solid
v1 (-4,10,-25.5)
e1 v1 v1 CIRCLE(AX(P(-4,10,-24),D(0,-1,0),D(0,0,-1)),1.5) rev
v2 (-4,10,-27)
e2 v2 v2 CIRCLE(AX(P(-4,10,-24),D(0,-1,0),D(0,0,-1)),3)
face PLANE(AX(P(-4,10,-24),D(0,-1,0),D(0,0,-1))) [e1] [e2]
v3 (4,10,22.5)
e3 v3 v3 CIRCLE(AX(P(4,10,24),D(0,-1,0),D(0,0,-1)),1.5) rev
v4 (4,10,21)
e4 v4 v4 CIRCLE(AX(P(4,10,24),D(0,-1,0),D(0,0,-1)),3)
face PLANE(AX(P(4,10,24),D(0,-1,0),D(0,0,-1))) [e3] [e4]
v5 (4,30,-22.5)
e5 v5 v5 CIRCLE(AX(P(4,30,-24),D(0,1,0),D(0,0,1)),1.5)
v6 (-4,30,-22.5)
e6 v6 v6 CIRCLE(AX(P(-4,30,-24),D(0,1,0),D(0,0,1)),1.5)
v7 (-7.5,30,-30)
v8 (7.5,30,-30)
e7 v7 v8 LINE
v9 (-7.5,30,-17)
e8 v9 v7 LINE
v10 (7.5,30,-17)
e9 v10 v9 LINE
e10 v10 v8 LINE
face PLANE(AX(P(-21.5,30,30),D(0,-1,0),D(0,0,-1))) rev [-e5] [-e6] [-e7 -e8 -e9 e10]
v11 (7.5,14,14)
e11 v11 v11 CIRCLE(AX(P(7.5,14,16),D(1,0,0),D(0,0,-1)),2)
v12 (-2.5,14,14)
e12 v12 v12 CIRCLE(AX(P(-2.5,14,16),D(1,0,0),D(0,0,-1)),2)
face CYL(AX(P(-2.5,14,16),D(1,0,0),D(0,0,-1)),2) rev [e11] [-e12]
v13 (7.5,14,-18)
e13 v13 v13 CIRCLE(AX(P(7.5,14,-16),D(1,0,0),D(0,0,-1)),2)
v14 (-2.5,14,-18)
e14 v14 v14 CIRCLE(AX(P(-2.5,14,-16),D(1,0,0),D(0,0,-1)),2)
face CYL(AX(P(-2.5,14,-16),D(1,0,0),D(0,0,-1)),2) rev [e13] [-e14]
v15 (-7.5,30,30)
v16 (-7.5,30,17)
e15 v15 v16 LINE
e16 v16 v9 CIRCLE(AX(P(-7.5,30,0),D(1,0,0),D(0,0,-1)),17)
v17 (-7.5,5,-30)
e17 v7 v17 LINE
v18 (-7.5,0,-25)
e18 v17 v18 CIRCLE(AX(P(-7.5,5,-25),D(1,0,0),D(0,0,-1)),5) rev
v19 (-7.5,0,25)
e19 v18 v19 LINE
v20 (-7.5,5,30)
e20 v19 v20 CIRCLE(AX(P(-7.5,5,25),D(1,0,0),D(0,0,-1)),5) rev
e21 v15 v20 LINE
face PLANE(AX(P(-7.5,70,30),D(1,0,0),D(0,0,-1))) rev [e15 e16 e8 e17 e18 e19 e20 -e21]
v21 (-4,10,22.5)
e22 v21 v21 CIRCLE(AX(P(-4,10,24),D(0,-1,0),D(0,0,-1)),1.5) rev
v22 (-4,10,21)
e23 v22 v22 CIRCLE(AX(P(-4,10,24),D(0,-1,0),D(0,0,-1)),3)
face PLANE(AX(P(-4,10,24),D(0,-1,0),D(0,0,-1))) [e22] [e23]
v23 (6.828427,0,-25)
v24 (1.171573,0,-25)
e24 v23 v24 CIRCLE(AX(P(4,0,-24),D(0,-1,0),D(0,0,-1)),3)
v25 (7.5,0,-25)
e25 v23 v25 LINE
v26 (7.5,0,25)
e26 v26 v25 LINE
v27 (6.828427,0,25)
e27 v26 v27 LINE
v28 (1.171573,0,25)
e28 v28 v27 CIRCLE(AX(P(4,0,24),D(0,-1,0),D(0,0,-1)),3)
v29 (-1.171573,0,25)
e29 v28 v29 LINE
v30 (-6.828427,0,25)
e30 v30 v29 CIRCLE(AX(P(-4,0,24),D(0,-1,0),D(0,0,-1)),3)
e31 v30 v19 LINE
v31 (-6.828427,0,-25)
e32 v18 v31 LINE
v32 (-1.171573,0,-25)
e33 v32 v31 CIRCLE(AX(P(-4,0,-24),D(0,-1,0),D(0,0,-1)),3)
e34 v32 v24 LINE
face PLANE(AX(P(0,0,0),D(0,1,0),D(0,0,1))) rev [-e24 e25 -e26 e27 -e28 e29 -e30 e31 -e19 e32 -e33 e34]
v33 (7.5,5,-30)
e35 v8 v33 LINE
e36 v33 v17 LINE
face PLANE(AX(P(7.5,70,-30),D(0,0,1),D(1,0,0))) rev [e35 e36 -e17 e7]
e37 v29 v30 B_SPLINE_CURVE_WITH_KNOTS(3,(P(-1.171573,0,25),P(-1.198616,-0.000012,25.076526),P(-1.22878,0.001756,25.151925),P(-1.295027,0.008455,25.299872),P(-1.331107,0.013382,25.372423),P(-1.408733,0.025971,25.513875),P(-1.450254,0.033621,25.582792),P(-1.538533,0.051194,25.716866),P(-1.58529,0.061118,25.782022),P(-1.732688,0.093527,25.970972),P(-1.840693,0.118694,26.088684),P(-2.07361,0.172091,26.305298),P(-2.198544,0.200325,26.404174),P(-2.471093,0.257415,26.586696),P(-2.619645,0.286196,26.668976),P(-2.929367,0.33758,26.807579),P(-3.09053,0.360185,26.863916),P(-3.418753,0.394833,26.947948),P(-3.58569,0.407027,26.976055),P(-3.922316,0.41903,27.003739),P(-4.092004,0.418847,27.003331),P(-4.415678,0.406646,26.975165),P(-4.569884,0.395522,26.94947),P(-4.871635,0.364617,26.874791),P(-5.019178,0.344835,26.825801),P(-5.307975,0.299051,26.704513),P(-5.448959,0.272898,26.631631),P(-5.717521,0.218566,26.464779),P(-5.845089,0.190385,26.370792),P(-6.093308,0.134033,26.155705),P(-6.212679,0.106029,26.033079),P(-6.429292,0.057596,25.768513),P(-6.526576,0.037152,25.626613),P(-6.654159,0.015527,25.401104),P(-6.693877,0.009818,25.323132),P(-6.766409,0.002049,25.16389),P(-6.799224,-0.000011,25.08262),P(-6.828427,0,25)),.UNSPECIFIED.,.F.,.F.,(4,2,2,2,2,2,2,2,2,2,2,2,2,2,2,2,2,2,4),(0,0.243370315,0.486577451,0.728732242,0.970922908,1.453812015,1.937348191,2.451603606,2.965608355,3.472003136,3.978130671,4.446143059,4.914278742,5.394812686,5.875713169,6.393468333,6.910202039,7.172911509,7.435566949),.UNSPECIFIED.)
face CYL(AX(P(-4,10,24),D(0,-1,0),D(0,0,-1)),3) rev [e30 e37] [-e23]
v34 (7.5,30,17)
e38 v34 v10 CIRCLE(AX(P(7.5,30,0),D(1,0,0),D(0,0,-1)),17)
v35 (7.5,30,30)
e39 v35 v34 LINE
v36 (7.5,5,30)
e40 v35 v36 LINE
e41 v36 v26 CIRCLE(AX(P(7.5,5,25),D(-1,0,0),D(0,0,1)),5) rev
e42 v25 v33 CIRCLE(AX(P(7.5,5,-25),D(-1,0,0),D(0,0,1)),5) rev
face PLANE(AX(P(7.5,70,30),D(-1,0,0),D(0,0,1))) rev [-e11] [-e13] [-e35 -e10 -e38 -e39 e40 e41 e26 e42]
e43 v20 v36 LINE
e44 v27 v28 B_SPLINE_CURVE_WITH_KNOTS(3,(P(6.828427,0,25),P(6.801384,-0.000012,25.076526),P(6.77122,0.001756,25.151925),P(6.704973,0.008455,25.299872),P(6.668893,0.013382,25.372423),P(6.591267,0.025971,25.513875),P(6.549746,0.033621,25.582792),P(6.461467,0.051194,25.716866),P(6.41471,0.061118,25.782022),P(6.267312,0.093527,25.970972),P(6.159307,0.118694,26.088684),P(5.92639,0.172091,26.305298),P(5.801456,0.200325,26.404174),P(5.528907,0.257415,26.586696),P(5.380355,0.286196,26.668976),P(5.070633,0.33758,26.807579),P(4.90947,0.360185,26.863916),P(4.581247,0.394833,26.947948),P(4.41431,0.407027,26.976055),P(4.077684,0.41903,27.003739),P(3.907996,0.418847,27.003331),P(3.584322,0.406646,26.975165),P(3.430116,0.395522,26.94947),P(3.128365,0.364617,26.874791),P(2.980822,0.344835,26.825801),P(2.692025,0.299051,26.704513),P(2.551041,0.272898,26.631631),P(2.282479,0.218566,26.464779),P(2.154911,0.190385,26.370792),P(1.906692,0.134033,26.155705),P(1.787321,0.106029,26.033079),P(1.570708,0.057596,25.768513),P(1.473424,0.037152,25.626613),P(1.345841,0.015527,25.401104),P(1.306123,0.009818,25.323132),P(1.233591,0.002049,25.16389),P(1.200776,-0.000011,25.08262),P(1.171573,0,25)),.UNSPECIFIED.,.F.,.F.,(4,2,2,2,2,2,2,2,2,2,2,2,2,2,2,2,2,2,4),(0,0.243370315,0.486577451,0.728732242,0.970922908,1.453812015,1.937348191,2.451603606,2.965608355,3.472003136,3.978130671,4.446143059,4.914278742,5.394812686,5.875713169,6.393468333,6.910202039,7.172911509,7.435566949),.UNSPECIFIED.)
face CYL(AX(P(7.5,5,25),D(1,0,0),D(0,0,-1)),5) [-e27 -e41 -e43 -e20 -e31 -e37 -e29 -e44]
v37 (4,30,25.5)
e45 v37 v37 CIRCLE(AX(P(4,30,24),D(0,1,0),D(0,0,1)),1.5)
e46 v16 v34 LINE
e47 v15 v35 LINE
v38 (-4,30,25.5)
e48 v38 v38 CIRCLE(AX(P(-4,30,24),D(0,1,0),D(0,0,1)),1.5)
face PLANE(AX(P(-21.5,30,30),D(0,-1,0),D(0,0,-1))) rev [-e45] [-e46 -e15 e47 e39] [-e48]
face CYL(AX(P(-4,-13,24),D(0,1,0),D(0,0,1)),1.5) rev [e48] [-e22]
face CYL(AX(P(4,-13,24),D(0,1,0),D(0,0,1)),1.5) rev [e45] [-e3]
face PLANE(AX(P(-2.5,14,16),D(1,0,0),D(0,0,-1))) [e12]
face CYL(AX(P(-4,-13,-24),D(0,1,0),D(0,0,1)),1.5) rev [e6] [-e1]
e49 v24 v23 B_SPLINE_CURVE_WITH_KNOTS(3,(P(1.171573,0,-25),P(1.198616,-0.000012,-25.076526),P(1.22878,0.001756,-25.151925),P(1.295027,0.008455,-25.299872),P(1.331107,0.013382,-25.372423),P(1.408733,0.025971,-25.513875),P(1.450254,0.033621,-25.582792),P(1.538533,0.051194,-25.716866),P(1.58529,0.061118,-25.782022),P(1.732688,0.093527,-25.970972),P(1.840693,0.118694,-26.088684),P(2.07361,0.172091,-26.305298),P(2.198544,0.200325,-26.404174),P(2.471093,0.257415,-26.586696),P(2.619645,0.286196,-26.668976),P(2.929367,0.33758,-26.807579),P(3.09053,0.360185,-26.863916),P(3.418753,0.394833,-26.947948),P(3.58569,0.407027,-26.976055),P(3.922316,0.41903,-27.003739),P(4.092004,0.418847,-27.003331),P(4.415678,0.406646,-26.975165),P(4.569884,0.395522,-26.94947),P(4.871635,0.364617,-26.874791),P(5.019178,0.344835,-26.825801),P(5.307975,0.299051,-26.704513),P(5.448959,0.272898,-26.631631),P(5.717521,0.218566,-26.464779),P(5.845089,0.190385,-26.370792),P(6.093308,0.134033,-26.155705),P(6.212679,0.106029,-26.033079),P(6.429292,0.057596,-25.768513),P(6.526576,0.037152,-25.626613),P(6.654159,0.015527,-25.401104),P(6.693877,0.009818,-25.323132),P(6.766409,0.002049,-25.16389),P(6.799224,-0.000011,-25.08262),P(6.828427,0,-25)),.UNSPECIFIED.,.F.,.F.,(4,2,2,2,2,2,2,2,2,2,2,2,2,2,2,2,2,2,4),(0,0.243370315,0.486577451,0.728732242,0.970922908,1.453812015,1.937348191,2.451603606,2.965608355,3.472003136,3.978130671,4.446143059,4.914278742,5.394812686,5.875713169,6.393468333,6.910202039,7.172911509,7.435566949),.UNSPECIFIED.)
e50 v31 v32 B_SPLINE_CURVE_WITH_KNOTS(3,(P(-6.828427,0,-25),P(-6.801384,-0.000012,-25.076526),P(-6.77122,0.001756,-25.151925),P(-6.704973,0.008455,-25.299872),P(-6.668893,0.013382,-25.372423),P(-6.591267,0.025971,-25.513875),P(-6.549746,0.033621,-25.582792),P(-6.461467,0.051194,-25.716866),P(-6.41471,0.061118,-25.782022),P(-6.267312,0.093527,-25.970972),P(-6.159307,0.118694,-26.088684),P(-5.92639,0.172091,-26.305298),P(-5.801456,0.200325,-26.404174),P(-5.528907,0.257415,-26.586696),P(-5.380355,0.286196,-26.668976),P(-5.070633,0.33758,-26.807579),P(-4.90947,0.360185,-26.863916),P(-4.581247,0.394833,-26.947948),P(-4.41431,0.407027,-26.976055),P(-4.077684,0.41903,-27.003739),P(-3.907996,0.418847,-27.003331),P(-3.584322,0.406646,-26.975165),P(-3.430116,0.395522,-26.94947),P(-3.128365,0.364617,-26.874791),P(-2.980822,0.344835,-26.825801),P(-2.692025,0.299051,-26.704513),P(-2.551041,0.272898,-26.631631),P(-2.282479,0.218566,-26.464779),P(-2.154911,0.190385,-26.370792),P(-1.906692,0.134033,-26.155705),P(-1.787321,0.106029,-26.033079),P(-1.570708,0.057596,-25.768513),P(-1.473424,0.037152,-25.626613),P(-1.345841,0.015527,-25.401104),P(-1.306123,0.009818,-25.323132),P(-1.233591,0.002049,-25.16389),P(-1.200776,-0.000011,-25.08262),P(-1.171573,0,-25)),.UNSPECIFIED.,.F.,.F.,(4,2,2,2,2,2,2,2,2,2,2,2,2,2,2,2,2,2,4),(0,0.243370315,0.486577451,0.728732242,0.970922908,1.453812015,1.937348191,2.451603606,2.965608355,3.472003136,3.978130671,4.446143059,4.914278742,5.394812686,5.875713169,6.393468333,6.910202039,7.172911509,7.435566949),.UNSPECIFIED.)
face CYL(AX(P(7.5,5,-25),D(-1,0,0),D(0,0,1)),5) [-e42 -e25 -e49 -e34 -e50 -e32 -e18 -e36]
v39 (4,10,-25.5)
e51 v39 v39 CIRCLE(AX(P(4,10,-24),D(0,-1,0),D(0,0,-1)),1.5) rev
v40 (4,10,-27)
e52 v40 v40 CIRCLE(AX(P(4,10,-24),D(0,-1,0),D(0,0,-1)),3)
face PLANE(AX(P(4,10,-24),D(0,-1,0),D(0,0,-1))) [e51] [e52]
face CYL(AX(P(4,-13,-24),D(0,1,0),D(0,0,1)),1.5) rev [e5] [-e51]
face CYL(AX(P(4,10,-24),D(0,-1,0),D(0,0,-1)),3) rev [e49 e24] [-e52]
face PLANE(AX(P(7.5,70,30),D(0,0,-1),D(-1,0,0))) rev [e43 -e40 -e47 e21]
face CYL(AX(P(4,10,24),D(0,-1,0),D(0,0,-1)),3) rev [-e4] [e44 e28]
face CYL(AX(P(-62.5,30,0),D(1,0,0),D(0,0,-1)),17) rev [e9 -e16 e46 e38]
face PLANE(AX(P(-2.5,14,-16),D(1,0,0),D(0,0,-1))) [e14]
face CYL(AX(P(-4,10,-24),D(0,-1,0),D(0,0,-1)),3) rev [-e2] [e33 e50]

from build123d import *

# Parameters (mm, degrees)
SKETCH1_W           = 15
SKETCH1_H           = 60
BOSS_EXTRUDE1_DEPTH = 70
SKETCH2_R           = 17
CUT_EXTRUDE1_DEPTH  = 70
SKETCH3_W           = 60
SKETCH3_H           = 40
CUT_EXTRUDE2_DEPTH  = 29
SKETCH4_R           = 1.5
CUT_EXTRUDE3_DEPTH  = 43
SKETCH5_R           = 2
CUT_EXTRUDE4_DEPTH  = 10
SKETCH7_R           = 3
CUT_EXTRUDE5_DEPTH  = 10
FILLET1_R           = 5


with BuildPart() as part:
    # Sketch1 → Boss-Extrude1 (new body)
    with BuildSketch(Plane(origin=(0, 0, 0), x_dir=(1, 0, 0), z_dir=(0, 1, 0))):
        Rectangle(SKETCH1_W, SKETCH1_H)
    extrude(amount=BOSS_EXTRUDE1_DEPTH)

    # Sketch2 → Cut-Extrude1 (cut)
    with BuildSketch(Plane(origin=(7.5, 0, 0), x_dir=(0, 0, -1), z_dir=(1, 0, 0))):
        with Locations((0, 30)):
            Circle(SKETCH2_R)
    extrude(amount=-CUT_EXTRUDE1_DEPTH, mode=Mode.SUBTRACT)

    # Sketch3 → Cut-Extrude2 (cut)
    with BuildSketch(Plane(origin=(7.5, 0, 0), x_dir=(0, 0, -1), z_dir=(1, 0, 0))):
        with Locations((0, 50)):
            Rectangle(SKETCH3_W, SKETCH3_H)
    extrude(amount=-CUT_EXTRUDE2_DEPTH, mode=Mode.SUBTRACT)

    # Sketch4 → Cut-Extrude3 (cut)
    with BuildSketch(Plane(origin=(0, 30, 0), x_dir=(1, 0, 0), z_dir=(0, 1, 0))):
        with Locations(Location((-4, 24, 0), (0, 0, 270))):
            Circle(SKETCH4_R)
        with Locations(Location((4, 24, 0), (0, 0, 270))):
            Circle(SKETCH4_R)
        with Locations(Location((-4, -24, 0), (0, 0, 270))):
            Circle(SKETCH4_R)
        with Locations(Location((4, -24, 0), (0, 0, 270))):
            Circle(SKETCH4_R)
    extrude(amount=-CUT_EXTRUDE3_DEPTH, mode=Mode.SUBTRACT)

    # Sketch5 → Cut-Extrude4 (cut)
    with BuildSketch(Plane(origin=(7.5, 0, 0), x_dir=(0, 0, -1), z_dir=(1, 0, 0))):
        with Locations((-16, 14)):
            Circle(SKETCH5_R)
        with Locations((16, 14)):
            Circle(SKETCH5_R)
    extrude(amount=-CUT_EXTRUDE4_DEPTH, mode=Mode.SUBTRACT)

    # Sketch7 → Cut-Extrude5 (cut)
    with BuildSketch(Plane.XZ):
        with Locations(Location((-4, 24, 0), (0, 0, 270))):
            Circle(SKETCH7_R)
        with Locations(Location((4, 24, 0), (0, 0, 270))):
            Circle(SKETCH7_R)
        with Locations(Location((-4, -24, 0), (0, 0, 270))):
            Circle(SKETCH7_R)
        with Locations(Location((4, -24, 0), (0, 0, 270))):
            Circle(SKETCH7_R)
    extrude(amount=-CUT_EXTRUDE5_DEPTH, mode=Mode.SUBTRACT)

    # Fillet1
    # the kernel refuses this fillet: 5 mm, written as the material it takes off along each edge
    with BuildSketch(Plane(origin=(-20, 0, -30), x_dir=(0, 0, 1), z_dir=(1, 0, 0))) as fillet1_piece_1:
        with BuildLine():
            CenterArc((FILLET1_R, -FILLET1_R), FILLET1_R, 90, 90)
            Line((0, -FILLET1_R), (0, 0))
            Line((0, 0), (FILLET1_R, 0))
        make_face()
    extrude(amount=40, mode=Mode.SUBTRACT)
    with BuildSketch(Plane(origin=(20, 0, 30), x_dir=(0, 1, 0), z_dir=(-1, 0, 0))) as fillet1_piece_2:
        with BuildLine():
            CenterArc((FILLET1_R, FILLET1_R), FILLET1_R, 180, 90)
            Line((0, FILLET1_R), (0, 0))
            Line((0, 0), (FILLET1_R, 0))
        make_face()
    extrude(amount=40, mode=Mode.SUBTRACT)


solid = part.part
